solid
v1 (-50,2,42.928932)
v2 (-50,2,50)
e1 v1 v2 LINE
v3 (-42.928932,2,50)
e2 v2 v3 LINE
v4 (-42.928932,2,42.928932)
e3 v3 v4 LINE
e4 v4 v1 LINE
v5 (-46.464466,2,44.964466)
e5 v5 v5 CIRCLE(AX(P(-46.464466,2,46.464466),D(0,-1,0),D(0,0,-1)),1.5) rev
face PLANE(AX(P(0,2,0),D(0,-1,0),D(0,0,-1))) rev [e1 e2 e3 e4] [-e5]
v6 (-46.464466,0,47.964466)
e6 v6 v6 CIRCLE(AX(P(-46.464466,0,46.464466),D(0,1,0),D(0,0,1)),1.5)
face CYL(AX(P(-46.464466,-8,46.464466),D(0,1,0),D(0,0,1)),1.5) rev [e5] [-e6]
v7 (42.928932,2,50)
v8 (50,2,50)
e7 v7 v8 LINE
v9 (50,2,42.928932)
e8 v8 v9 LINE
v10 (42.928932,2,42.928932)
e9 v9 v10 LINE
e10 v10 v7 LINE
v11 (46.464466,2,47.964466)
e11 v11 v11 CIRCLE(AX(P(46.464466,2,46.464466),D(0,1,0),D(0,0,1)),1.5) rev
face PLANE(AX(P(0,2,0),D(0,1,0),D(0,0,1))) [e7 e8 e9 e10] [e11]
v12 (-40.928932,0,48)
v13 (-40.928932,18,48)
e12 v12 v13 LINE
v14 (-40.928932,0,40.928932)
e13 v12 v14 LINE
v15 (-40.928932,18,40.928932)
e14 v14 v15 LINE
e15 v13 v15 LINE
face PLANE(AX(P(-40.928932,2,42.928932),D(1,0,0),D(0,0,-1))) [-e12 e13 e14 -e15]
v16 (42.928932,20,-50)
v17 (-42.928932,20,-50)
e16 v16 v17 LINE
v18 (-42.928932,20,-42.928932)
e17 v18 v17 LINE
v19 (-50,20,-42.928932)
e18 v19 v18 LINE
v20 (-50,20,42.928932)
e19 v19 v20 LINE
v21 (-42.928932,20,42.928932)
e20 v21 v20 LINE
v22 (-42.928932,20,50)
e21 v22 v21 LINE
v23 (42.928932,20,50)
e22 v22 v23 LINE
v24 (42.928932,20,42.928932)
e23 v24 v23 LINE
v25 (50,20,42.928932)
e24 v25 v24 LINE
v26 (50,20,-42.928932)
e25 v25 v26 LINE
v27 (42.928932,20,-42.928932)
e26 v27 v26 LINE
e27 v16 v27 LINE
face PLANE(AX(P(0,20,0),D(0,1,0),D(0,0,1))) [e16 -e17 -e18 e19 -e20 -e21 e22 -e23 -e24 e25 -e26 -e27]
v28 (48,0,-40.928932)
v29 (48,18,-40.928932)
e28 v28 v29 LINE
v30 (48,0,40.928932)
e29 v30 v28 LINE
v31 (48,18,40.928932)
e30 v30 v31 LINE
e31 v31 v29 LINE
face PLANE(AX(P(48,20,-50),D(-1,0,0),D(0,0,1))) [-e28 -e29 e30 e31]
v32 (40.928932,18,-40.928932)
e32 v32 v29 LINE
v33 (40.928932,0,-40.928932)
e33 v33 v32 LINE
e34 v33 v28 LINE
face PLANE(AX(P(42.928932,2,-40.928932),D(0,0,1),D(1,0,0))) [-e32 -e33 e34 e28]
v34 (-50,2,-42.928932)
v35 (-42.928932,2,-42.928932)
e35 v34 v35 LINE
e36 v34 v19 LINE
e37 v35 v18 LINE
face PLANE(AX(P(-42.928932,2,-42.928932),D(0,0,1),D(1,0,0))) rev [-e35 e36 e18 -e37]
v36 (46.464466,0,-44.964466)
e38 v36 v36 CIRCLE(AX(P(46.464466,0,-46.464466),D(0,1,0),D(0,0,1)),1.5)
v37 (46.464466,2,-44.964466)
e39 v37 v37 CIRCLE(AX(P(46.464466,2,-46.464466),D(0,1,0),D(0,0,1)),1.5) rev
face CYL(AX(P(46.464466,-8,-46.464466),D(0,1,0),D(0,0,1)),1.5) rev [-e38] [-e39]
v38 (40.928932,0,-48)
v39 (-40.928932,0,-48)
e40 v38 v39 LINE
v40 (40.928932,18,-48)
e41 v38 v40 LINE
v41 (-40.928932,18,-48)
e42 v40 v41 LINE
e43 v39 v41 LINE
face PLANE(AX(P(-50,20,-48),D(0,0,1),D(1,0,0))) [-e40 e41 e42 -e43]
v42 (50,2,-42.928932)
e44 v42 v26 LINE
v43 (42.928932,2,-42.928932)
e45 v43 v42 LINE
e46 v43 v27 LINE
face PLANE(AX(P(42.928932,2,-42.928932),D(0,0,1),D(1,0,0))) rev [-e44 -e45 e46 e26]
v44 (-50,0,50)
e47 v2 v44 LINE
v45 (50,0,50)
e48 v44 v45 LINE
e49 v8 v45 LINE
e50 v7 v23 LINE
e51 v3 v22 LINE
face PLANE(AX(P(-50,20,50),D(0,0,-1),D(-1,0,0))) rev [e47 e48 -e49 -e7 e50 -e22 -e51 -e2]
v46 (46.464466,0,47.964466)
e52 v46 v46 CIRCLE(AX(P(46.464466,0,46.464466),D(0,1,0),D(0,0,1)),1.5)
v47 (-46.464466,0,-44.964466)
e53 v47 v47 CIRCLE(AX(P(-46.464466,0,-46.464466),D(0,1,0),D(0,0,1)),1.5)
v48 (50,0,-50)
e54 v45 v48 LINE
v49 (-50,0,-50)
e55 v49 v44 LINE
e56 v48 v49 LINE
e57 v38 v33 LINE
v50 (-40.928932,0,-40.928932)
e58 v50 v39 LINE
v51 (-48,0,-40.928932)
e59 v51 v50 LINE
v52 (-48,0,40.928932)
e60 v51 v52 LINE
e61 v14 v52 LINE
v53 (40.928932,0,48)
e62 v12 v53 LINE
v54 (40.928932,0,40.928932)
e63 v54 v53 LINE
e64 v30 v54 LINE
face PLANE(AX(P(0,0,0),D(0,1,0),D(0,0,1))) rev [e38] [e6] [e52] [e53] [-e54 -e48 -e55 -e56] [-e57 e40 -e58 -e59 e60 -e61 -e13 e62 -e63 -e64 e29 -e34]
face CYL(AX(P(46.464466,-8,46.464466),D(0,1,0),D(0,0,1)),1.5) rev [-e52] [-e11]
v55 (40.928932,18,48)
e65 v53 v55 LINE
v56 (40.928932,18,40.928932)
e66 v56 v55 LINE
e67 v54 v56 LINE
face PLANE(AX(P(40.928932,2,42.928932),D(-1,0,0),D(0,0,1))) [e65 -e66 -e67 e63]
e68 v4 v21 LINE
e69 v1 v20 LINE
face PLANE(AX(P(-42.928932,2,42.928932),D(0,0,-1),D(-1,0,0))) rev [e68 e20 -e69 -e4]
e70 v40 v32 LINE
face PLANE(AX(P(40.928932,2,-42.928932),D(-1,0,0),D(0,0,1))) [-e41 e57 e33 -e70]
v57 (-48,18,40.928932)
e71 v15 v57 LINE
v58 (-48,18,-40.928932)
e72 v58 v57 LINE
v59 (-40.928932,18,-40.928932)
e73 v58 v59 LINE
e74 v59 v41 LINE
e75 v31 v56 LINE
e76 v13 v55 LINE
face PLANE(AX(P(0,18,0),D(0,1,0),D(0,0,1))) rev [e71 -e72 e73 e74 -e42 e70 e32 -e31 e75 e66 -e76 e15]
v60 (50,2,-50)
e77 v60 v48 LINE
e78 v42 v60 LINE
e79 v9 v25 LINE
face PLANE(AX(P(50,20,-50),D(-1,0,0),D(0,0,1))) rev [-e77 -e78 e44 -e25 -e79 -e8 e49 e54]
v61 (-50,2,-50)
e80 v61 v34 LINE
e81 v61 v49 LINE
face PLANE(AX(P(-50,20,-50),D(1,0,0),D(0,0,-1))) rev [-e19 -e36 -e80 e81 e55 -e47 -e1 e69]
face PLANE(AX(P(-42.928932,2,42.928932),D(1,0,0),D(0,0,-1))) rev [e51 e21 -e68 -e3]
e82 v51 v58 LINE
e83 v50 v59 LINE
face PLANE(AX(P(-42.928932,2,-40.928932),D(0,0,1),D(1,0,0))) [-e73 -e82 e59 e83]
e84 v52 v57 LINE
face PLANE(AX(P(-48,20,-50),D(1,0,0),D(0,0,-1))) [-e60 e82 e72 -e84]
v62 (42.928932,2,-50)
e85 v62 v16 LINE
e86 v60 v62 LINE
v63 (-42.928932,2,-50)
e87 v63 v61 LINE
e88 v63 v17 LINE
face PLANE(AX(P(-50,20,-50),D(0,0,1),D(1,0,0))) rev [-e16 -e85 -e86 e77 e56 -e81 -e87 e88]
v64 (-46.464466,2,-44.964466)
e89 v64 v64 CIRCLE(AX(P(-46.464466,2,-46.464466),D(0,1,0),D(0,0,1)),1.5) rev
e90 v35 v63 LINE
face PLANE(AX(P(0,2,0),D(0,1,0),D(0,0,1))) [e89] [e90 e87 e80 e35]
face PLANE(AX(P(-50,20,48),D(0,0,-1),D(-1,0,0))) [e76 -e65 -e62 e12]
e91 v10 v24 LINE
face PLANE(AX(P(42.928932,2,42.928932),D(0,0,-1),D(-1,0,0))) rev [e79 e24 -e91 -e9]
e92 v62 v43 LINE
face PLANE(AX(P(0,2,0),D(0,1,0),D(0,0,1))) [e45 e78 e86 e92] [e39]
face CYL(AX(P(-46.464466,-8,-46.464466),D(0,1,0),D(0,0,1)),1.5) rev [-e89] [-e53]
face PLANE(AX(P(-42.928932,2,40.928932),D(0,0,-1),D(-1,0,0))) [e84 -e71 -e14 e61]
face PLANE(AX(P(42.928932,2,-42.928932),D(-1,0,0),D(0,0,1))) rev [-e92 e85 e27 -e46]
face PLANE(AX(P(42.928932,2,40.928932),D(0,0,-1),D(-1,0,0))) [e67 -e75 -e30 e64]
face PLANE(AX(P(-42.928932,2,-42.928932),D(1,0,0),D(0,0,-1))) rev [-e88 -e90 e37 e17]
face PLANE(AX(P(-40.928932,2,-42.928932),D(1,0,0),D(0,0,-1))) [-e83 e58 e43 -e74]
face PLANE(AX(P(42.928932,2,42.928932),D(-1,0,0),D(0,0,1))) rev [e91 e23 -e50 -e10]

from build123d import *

# Parameters (mm, degrees)
CROQUIS1_W              = 100
CROQUIS1_H              = 100
SALIENTE_EXTRUIR1_DEPTH = 20
CROQUIS2_R              = 1.5
CORTAR_EXTRUIR1_DEPTH   = 28
CROQUIS3_W              = 7.071067812
CROQUIS3_H              = 7.071067812
CORTAR_EXTRUIR2_DEPTH   = 18
VACIADO1_START          = -48
VACIADO1_OUTLINE_W      = 18
VACIADO1_OUTLINE_H      = 81.857864376
VACIADO1_DEPTH          = 96
VACIADO1_START_2        = -40.928932188
VACIADO1_2_OUTLINE_W    = 18
VACIADO1_2_OUTLINE_H    = 7.071067812
VACIADO1_2_DEPTH        = 81.857864376


# Read off the part's stored shape, not the designer's step: Vaciado1
with BuildPart() as part:
    # Croquis1 → Saliente-Extruir1 (new body)
    with BuildSketch(Plane(origin=(0, 0, 0), x_dir=(1, 0, 0), z_dir=(0, 1, 0))):
        Rectangle(CROQUIS1_W, CROQUIS1_H)
    extrude(amount=SALIENTE_EXTRUIR1_DEPTH)

    # Croquis2 → Cortar-Extruir1 (cut)
    with BuildSketch(Plane(origin=(0, 20, 0), x_dir=(1, 0, 0), z_dir=(0, 1, 0))):
        with Locations(Location((-46.464466094, -46.464466094, 0), (0, 0, 270))):
            Circle(CROQUIS2_R)
        with Locations(Location((-46.464466094, 46.464466094, 0), (0, 0, 270))):
            Circle(CROQUIS2_R)
        with Locations(Location((46.464466094, 46.464466094, 0), (0, 0, 270))):
            Circle(CROQUIS2_R)
        with Locations(Location((46.464466094, -46.464466094, 0), (0, 0, 270))):
            Circle(CROQUIS2_R)
    extrude(amount=-CORTAR_EXTRUIR1_DEPTH, mode=Mode.SUBTRACT)

    # Croquis3 → Cortar-Extruir2 (cut)
    with BuildSketch(Plane(origin=(0, 20, 0), x_dir=(1, 0, 0), z_dir=(0, 1, 0))):
        with Locations((-46.464466094, -46.464466094)):
            Rectangle(CROQUIS3_W, CROQUIS3_H)
        with Locations((-46.464466094, 46.464466094)):
            Rectangle(CROQUIS3_W, CROQUIS3_H)
        with Locations((46.464466094, 46.464466094)):
            Rectangle(CROQUIS3_W, CROQUIS3_H)
        with Locations((46.464466094, -46.464466094)):
            Rectangle(CROQUIS3_W, CROQUIS3_H)
    extrude(amount=-CORTAR_EXTRUIR2_DEPTH, mode=Mode.SUBTRACT)

    # Vaciado1 outline → Vaciado1 (cut)
    with BuildSketch(Plane.YZ.offset(VACIADO1_START)):
        with Locations((9, 0)):
            Rectangle(VACIADO1_OUTLINE_W, VACIADO1_OUTLINE_H)
    extrude(amount=VACIADO1_DEPTH, mode=Mode.SUBTRACT)

    # Vaciado1 2 outline → Vaciado1 2 (cut)
    with BuildSketch(Plane.YZ.offset(VACIADO1_START_2)):
        with Locations((9, -44.464466094)):
            Rectangle(VACIADO1_2_OUTLINE_W, VACIADO1_2_OUTLINE_H)
        with Locations((9, 44.464466094)):
            Rectangle(VACIADO1_2_OUTLINE_W, VACIADO1_2_OUTLINE_H)
    extrude(amount=VACIADO1_2_DEPTH, mode=Mode.SUBTRACT)


solid = part.part
